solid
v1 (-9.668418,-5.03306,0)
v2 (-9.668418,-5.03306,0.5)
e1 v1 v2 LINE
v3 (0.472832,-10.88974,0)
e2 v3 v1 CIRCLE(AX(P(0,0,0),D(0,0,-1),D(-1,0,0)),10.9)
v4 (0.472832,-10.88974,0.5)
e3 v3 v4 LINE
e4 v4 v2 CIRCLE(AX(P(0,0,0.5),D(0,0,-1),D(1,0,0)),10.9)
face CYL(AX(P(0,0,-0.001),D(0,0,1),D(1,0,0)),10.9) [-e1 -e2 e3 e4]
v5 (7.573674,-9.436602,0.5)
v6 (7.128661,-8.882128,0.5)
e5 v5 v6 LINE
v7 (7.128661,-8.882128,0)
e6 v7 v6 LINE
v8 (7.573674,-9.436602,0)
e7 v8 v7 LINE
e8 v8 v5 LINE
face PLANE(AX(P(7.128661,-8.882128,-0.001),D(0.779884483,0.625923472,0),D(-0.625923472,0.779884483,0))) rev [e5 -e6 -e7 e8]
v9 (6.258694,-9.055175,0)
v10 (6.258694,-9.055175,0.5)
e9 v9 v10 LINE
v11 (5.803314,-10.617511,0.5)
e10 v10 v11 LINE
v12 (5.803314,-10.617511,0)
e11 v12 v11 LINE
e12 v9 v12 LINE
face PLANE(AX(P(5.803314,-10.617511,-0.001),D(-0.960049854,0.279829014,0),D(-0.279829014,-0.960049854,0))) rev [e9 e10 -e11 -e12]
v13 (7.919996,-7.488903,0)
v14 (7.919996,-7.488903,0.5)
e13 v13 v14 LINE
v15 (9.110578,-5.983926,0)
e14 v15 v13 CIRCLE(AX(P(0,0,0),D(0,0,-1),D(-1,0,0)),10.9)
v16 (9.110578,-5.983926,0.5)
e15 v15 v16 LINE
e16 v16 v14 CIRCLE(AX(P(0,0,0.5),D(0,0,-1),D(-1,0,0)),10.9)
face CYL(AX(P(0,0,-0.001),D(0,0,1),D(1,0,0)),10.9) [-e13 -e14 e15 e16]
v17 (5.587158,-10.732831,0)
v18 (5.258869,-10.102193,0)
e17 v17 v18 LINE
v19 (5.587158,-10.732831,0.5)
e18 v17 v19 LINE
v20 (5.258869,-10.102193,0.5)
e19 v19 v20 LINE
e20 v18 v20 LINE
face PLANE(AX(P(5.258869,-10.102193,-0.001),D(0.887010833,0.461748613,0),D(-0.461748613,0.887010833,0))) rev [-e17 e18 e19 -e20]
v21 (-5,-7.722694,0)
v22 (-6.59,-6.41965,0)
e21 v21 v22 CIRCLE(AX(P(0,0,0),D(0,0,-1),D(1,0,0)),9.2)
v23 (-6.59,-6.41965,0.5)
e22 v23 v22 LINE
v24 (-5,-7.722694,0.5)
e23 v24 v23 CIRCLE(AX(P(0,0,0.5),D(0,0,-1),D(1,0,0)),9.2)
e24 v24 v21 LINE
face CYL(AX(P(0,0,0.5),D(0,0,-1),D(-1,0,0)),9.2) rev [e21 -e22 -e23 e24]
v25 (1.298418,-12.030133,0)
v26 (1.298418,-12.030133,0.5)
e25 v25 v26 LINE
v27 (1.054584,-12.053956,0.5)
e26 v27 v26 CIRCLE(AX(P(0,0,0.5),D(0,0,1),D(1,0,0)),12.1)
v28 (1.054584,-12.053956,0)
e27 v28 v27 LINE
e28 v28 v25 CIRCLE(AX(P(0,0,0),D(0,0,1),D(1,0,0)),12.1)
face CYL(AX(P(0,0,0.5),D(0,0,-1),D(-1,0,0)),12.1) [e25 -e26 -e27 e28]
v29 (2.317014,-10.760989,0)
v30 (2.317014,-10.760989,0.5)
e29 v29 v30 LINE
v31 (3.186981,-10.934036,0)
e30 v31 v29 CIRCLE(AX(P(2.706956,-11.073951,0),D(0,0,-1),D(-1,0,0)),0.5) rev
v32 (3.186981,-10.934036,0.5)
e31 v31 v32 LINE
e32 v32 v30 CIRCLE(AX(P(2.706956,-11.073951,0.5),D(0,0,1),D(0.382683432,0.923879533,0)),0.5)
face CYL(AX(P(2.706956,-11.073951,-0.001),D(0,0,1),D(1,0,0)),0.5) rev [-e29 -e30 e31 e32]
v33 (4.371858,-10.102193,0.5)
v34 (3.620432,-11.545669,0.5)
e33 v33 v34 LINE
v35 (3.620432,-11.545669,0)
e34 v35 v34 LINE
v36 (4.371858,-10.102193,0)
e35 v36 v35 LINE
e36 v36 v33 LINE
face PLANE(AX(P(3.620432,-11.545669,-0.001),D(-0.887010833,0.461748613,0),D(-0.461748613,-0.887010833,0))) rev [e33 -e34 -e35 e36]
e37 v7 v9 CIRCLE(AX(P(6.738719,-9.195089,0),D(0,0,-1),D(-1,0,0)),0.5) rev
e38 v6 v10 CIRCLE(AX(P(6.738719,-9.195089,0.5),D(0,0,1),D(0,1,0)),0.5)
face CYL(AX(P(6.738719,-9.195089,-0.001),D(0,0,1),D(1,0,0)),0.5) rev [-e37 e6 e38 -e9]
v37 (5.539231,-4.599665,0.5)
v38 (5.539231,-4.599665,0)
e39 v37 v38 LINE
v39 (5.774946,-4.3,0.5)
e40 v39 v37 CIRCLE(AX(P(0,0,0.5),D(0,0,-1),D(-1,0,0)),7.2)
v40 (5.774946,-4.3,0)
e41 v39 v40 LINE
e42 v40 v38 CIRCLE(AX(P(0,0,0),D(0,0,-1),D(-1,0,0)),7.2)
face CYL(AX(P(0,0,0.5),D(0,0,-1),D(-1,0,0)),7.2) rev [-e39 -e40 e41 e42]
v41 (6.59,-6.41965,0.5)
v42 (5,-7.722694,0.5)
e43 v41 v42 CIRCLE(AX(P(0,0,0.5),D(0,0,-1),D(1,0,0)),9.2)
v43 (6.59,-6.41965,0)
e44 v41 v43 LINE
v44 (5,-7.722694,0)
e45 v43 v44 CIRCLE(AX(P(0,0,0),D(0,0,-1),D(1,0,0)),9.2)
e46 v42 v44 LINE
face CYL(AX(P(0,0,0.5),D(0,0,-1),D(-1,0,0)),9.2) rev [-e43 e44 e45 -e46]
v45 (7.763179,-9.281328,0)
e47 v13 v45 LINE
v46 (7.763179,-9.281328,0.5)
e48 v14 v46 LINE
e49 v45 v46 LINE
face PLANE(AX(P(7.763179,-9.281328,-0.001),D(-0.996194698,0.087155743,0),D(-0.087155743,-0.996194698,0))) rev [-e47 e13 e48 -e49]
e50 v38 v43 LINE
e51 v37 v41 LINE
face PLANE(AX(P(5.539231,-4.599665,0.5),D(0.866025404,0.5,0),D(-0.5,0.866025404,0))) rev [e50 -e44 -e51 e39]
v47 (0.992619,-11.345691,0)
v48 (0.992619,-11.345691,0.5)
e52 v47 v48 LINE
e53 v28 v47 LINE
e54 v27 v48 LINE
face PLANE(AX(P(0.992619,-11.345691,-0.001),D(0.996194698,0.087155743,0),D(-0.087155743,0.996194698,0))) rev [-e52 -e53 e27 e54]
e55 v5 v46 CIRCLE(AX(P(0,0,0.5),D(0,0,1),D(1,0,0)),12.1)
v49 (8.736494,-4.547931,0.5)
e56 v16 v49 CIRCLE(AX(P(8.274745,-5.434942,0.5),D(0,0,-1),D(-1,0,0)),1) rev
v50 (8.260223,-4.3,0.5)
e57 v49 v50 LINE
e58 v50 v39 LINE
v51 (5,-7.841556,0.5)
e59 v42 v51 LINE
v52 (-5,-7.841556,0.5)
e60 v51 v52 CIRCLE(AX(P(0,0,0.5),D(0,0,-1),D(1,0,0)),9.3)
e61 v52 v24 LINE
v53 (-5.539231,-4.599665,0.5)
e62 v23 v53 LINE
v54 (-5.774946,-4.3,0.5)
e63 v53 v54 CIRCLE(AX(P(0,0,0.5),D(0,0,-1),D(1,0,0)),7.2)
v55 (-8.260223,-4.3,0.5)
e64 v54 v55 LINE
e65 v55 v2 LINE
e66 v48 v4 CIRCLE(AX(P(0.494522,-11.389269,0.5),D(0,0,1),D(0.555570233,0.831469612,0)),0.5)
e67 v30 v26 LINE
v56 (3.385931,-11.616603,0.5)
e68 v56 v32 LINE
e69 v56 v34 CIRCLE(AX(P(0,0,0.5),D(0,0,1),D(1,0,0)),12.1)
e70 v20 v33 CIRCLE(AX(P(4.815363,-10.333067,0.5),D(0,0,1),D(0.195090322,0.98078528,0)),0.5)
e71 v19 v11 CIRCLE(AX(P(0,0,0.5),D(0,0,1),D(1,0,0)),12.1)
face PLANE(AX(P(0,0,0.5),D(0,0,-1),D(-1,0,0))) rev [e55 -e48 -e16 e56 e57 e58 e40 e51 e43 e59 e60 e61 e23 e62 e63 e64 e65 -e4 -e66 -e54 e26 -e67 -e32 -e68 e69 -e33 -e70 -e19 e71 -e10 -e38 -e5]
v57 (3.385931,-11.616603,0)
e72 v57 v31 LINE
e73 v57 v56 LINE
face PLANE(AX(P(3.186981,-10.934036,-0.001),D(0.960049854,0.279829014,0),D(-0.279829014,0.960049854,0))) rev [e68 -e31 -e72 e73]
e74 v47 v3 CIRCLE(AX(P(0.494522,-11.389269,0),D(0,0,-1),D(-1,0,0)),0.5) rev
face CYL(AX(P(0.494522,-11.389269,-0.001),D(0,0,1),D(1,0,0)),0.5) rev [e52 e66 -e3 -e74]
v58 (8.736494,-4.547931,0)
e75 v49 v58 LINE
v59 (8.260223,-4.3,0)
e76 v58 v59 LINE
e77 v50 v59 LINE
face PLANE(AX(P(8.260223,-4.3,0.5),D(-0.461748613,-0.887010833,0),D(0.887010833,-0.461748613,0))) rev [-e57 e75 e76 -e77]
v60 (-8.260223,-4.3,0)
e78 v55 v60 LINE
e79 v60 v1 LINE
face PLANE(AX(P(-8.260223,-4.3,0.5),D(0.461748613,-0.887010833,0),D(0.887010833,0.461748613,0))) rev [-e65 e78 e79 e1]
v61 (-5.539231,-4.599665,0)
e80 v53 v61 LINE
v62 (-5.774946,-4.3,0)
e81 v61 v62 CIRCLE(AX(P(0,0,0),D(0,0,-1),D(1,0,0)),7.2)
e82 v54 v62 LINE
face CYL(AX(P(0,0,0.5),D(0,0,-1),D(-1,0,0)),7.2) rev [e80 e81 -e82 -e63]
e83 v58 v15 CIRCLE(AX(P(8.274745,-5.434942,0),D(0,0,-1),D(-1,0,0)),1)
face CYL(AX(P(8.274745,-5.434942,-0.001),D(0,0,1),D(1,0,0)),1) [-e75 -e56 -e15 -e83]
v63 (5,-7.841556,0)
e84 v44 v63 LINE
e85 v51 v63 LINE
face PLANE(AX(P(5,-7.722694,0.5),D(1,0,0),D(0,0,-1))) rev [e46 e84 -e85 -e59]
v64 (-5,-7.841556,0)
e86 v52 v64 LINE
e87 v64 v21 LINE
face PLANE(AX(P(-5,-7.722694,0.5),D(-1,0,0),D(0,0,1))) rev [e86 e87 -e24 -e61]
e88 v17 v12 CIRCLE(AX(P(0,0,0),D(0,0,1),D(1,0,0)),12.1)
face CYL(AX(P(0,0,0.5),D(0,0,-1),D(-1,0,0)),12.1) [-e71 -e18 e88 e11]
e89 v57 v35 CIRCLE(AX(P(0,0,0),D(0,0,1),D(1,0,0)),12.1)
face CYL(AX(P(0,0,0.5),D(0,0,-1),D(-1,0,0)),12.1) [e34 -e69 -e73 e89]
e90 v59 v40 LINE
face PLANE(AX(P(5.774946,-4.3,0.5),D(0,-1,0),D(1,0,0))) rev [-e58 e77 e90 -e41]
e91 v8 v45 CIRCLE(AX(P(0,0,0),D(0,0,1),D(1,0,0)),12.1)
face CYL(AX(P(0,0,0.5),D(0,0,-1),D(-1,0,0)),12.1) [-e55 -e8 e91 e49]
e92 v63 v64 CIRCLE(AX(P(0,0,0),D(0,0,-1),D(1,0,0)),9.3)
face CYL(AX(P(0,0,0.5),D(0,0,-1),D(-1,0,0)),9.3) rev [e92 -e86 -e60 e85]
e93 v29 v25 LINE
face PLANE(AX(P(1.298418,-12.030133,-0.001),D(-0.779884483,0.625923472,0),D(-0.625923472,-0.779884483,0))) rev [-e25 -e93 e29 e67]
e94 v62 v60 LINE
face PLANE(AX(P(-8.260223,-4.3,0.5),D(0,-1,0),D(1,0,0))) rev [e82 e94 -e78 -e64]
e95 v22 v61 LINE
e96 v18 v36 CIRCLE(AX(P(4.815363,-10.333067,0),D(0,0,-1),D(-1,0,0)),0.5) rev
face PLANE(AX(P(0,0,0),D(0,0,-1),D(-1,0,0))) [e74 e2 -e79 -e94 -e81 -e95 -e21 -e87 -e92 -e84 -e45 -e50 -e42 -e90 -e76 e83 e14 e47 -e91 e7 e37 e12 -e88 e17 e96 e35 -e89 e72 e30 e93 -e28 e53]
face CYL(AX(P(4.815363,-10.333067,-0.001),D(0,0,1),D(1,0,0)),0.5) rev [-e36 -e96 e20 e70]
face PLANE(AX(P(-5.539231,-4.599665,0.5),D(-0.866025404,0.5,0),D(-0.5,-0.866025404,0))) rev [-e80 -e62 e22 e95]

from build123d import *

# Parameters (mm, degrees)
OTHER_10076_5_DEPTH = 0.5
CUT_EXTRUDE1_START  = -0.5
CUT_EXTRUDE1_DEPTH  = 0.5


# Read off the part's stored shape, not the designer's step: 10076-5
with BuildPart() as part:
    # Other 10076-5 outline → Other 10076-5 (new body)
    with BuildSketch(Plane.XY):
        with BuildLine():
            ThreePointArc((7.573674013, -9.436602245), (7.668819519, -9.359444812), (7.763179028, -9.281328104))
            Line((7.763179028, -9.281328104), (7.919995926, -7.488902759))
            ThreePointArc((7.919995926, -7.488902759), (8.548470738, -6.76266575), (9.110578105, -5.983925684))
            ThreePointArc((9.110578105, -5.983925684), (9.242448569, -5.182849851), (8.736493865, -4.547930843))
            Line((8.736493865, -4.547930843), (8.260223146, -4.3))
            Line((8.260223146, -4.3), (5.774945887, -4.3))
            ThreePointArc((5.774945887, -4.3), (5.659072475, -4.451392897), (5.53923133, -4.5996648))
            Line((5.53923133, -4.5996648), (6.59, -6.419649523))
            ThreePointArc((6.59, -6.419649523), (5.831509763, -7.1157216), (5, -7.722693831))
            Line((5, -7.722693831), (5, -7.841555968))
            ThreePointArc((5, -7.841555968), (0, -9.3), (-5, -7.841555968))
            Line((-5, -7.841555968), (-5, -7.722693831))
            ThreePointArc((-5, -7.722693831), (-5.831509763, -7.1157216), (-6.59, -6.419649523))
            Line((-6.59, -6.419649523), (-5.53923133, -4.5996648))
            ThreePointArc((-5.53923133, -4.5996648), (-5.659072475, -4.451392897), (-5.774945887, -4.3))
            Line((-5.774945887, -4.3), (-8.260223146, -4.3))
            Line((-8.260223146, -4.3), (-10.732831081, -5.58715822))
            ThreePointArc((-10.732831081, -5.58715822), (-10.675718173, -5.6955282), (-10.617511084, -5.803314431))
            Line((-10.617511084, -5.803314431), (-9.055174855, -6.258693914))
            ThreePointArc((-9.055174855, -6.258693914), (-8.704696722, -6.64117368), (-8.882127626, -7.128661083))
            Line((-8.882127626, -7.128661083), (-9.436602245, -7.573674013))
            ThreePointArc((-9.436602245, -7.573674013), (-9.359444812, -7.668819519), (-9.281328104, -7.763179028))
            Line((-9.281328104, -7.763179028), (-7.660171598, -7.905011844))
            ThreePointArc((-7.660171598, -7.905011844), (-7.241809703, -8.211767477), (-7.320727248, -8.724502998))
            Line((-7.320727248, -8.724502998), (-7.777730077, -9.269137762))
            ThreePointArc((-7.777730077, -9.269137762), (-7.683493234, -9.347402405), (-7.588468891, -9.424709008))
            Line((-7.588468891, -9.424709008), (-5.970792243, -9.247544602))
            ThreePointArc((-5.970792243, -9.247544602), (-5.500623999, -9.466787654), (-5.477995427, -9.985067155))
            Line((-5.477995427, -9.985067155), (-5.819964104, -10.608393744))
            ThreePointArc((-5.819964104, -10.608393744), (-5.712269322, -10.666769858), (-5.603989074, -10.724052707))
            Line((-5.603989074, -10.724052707), (-4.05195869, -10.234699407))
            ThreePointArc((-4.05195869, -10.234699407), (-3.548052399, -10.358004491), (-3.424747314, -10.861910782))
            Line((-3.424747314, -10.861910782), (-3.638540174, -11.539975104))
            ThreePointArc((-3.638540174, -11.539975104), (-3.521526102, -11.576219327), (-3.404151099, -11.611277074))
            Line((-3.404151099, -11.611277074), (-1.977410637, -10.828540453))
            ThreePointArc((-1.977410637, -10.828540453), (-1.459131136, -10.851169025), (-1.239888083, -11.321337268))
            Line((-1.239888083, -11.321337268), (-1.317289186, -12.028081692))
            ThreePointArc((-1.317289186, -12.028081692), (-1.195452609, -12.04080118), (-1.073493507, -12.052286575))
            Line((-1.073493507, -12.052286575), (0.173128198, -11.006246762))
            ThreePointArc((0.173128198, -11.006246762), (0.685863719, -10.927329218), (0.992619352, -11.345691113))
            Line((0.992619352, -11.345691113), (1.054584487, -12.053955847))
            ThreePointArc((1.054584487, -12.053955847), (1.176561457, -12.042661796), (1.298417839, -12.030133462))
            Line((1.298417839, -12.030133462), (2.317013814, -10.760989181))
            ThreePointArc((2.317013814, -10.760989181), (2.804501216, -10.583558277), (3.186980982, -10.93403641))
            Line((3.186980982, -10.93403641), (3.38593107, -11.616603238))
            ThreePointArc((3.38593107, -11.616603238), (3.503360927, -11.581729673), (3.620431715, -11.545669067))
            Line((3.620431715, -11.545669067), (4.371857887, -10.10219282))
            ThreePointArc((4.371857887, -10.10219282), (4.815363304, -9.833067127), (5.258868721, -10.10219282))
            Line((5.258868721, -10.10219282), (5.58715822, -10.732831081))
            ThreePointArc((5.58715822, -10.732831081), (5.6955282, -10.675718173), (5.803314431, -10.617511084))
            Line((5.803314431, -10.617511084), (6.258693914, -9.055174855))
            ThreePointArc((6.258693914, -9.055174855), (6.64117368, -8.704696722), (7.128661083, -8.882127626))
            Line((7.128661083, -8.882127626), (7.573674013, -9.436602245))
        make_face()
    extrude(amount=OTHER_10076_5_DEPTH)

    # Sketch1 → Cut-Extrude1 (cut)
    with BuildSketch(Plane.XY.offset(0.5).offset(CUT_EXTRUDE1_START)):
        with BuildLine():
            Line((-9.668418082, -5.033059884), (-10.732831081, -5.58715822))
            ThreePointArc((-10.732831081, -5.58715822), (-6.730289461, -10.055506142), (-1.073493507, -12.052286575))
            Line((-1.073493507, -12.052286575), (0.173128198, -11.006246762))
            ThreePointArc((0.173128198, -11.006246762), (0.31335902, -10.923243262), (0.472832442, -10.889739643))
            ThreePointArc((0.472832442, -10.889739643), (-5.451135044, -9.439021493), (-9.668418082, -5.033059884))
        make_face()
    extrude(amount=CUT_EXTRUDE1_DEPTH, mode=Mode.SUBTRACT)


solid = part.part
